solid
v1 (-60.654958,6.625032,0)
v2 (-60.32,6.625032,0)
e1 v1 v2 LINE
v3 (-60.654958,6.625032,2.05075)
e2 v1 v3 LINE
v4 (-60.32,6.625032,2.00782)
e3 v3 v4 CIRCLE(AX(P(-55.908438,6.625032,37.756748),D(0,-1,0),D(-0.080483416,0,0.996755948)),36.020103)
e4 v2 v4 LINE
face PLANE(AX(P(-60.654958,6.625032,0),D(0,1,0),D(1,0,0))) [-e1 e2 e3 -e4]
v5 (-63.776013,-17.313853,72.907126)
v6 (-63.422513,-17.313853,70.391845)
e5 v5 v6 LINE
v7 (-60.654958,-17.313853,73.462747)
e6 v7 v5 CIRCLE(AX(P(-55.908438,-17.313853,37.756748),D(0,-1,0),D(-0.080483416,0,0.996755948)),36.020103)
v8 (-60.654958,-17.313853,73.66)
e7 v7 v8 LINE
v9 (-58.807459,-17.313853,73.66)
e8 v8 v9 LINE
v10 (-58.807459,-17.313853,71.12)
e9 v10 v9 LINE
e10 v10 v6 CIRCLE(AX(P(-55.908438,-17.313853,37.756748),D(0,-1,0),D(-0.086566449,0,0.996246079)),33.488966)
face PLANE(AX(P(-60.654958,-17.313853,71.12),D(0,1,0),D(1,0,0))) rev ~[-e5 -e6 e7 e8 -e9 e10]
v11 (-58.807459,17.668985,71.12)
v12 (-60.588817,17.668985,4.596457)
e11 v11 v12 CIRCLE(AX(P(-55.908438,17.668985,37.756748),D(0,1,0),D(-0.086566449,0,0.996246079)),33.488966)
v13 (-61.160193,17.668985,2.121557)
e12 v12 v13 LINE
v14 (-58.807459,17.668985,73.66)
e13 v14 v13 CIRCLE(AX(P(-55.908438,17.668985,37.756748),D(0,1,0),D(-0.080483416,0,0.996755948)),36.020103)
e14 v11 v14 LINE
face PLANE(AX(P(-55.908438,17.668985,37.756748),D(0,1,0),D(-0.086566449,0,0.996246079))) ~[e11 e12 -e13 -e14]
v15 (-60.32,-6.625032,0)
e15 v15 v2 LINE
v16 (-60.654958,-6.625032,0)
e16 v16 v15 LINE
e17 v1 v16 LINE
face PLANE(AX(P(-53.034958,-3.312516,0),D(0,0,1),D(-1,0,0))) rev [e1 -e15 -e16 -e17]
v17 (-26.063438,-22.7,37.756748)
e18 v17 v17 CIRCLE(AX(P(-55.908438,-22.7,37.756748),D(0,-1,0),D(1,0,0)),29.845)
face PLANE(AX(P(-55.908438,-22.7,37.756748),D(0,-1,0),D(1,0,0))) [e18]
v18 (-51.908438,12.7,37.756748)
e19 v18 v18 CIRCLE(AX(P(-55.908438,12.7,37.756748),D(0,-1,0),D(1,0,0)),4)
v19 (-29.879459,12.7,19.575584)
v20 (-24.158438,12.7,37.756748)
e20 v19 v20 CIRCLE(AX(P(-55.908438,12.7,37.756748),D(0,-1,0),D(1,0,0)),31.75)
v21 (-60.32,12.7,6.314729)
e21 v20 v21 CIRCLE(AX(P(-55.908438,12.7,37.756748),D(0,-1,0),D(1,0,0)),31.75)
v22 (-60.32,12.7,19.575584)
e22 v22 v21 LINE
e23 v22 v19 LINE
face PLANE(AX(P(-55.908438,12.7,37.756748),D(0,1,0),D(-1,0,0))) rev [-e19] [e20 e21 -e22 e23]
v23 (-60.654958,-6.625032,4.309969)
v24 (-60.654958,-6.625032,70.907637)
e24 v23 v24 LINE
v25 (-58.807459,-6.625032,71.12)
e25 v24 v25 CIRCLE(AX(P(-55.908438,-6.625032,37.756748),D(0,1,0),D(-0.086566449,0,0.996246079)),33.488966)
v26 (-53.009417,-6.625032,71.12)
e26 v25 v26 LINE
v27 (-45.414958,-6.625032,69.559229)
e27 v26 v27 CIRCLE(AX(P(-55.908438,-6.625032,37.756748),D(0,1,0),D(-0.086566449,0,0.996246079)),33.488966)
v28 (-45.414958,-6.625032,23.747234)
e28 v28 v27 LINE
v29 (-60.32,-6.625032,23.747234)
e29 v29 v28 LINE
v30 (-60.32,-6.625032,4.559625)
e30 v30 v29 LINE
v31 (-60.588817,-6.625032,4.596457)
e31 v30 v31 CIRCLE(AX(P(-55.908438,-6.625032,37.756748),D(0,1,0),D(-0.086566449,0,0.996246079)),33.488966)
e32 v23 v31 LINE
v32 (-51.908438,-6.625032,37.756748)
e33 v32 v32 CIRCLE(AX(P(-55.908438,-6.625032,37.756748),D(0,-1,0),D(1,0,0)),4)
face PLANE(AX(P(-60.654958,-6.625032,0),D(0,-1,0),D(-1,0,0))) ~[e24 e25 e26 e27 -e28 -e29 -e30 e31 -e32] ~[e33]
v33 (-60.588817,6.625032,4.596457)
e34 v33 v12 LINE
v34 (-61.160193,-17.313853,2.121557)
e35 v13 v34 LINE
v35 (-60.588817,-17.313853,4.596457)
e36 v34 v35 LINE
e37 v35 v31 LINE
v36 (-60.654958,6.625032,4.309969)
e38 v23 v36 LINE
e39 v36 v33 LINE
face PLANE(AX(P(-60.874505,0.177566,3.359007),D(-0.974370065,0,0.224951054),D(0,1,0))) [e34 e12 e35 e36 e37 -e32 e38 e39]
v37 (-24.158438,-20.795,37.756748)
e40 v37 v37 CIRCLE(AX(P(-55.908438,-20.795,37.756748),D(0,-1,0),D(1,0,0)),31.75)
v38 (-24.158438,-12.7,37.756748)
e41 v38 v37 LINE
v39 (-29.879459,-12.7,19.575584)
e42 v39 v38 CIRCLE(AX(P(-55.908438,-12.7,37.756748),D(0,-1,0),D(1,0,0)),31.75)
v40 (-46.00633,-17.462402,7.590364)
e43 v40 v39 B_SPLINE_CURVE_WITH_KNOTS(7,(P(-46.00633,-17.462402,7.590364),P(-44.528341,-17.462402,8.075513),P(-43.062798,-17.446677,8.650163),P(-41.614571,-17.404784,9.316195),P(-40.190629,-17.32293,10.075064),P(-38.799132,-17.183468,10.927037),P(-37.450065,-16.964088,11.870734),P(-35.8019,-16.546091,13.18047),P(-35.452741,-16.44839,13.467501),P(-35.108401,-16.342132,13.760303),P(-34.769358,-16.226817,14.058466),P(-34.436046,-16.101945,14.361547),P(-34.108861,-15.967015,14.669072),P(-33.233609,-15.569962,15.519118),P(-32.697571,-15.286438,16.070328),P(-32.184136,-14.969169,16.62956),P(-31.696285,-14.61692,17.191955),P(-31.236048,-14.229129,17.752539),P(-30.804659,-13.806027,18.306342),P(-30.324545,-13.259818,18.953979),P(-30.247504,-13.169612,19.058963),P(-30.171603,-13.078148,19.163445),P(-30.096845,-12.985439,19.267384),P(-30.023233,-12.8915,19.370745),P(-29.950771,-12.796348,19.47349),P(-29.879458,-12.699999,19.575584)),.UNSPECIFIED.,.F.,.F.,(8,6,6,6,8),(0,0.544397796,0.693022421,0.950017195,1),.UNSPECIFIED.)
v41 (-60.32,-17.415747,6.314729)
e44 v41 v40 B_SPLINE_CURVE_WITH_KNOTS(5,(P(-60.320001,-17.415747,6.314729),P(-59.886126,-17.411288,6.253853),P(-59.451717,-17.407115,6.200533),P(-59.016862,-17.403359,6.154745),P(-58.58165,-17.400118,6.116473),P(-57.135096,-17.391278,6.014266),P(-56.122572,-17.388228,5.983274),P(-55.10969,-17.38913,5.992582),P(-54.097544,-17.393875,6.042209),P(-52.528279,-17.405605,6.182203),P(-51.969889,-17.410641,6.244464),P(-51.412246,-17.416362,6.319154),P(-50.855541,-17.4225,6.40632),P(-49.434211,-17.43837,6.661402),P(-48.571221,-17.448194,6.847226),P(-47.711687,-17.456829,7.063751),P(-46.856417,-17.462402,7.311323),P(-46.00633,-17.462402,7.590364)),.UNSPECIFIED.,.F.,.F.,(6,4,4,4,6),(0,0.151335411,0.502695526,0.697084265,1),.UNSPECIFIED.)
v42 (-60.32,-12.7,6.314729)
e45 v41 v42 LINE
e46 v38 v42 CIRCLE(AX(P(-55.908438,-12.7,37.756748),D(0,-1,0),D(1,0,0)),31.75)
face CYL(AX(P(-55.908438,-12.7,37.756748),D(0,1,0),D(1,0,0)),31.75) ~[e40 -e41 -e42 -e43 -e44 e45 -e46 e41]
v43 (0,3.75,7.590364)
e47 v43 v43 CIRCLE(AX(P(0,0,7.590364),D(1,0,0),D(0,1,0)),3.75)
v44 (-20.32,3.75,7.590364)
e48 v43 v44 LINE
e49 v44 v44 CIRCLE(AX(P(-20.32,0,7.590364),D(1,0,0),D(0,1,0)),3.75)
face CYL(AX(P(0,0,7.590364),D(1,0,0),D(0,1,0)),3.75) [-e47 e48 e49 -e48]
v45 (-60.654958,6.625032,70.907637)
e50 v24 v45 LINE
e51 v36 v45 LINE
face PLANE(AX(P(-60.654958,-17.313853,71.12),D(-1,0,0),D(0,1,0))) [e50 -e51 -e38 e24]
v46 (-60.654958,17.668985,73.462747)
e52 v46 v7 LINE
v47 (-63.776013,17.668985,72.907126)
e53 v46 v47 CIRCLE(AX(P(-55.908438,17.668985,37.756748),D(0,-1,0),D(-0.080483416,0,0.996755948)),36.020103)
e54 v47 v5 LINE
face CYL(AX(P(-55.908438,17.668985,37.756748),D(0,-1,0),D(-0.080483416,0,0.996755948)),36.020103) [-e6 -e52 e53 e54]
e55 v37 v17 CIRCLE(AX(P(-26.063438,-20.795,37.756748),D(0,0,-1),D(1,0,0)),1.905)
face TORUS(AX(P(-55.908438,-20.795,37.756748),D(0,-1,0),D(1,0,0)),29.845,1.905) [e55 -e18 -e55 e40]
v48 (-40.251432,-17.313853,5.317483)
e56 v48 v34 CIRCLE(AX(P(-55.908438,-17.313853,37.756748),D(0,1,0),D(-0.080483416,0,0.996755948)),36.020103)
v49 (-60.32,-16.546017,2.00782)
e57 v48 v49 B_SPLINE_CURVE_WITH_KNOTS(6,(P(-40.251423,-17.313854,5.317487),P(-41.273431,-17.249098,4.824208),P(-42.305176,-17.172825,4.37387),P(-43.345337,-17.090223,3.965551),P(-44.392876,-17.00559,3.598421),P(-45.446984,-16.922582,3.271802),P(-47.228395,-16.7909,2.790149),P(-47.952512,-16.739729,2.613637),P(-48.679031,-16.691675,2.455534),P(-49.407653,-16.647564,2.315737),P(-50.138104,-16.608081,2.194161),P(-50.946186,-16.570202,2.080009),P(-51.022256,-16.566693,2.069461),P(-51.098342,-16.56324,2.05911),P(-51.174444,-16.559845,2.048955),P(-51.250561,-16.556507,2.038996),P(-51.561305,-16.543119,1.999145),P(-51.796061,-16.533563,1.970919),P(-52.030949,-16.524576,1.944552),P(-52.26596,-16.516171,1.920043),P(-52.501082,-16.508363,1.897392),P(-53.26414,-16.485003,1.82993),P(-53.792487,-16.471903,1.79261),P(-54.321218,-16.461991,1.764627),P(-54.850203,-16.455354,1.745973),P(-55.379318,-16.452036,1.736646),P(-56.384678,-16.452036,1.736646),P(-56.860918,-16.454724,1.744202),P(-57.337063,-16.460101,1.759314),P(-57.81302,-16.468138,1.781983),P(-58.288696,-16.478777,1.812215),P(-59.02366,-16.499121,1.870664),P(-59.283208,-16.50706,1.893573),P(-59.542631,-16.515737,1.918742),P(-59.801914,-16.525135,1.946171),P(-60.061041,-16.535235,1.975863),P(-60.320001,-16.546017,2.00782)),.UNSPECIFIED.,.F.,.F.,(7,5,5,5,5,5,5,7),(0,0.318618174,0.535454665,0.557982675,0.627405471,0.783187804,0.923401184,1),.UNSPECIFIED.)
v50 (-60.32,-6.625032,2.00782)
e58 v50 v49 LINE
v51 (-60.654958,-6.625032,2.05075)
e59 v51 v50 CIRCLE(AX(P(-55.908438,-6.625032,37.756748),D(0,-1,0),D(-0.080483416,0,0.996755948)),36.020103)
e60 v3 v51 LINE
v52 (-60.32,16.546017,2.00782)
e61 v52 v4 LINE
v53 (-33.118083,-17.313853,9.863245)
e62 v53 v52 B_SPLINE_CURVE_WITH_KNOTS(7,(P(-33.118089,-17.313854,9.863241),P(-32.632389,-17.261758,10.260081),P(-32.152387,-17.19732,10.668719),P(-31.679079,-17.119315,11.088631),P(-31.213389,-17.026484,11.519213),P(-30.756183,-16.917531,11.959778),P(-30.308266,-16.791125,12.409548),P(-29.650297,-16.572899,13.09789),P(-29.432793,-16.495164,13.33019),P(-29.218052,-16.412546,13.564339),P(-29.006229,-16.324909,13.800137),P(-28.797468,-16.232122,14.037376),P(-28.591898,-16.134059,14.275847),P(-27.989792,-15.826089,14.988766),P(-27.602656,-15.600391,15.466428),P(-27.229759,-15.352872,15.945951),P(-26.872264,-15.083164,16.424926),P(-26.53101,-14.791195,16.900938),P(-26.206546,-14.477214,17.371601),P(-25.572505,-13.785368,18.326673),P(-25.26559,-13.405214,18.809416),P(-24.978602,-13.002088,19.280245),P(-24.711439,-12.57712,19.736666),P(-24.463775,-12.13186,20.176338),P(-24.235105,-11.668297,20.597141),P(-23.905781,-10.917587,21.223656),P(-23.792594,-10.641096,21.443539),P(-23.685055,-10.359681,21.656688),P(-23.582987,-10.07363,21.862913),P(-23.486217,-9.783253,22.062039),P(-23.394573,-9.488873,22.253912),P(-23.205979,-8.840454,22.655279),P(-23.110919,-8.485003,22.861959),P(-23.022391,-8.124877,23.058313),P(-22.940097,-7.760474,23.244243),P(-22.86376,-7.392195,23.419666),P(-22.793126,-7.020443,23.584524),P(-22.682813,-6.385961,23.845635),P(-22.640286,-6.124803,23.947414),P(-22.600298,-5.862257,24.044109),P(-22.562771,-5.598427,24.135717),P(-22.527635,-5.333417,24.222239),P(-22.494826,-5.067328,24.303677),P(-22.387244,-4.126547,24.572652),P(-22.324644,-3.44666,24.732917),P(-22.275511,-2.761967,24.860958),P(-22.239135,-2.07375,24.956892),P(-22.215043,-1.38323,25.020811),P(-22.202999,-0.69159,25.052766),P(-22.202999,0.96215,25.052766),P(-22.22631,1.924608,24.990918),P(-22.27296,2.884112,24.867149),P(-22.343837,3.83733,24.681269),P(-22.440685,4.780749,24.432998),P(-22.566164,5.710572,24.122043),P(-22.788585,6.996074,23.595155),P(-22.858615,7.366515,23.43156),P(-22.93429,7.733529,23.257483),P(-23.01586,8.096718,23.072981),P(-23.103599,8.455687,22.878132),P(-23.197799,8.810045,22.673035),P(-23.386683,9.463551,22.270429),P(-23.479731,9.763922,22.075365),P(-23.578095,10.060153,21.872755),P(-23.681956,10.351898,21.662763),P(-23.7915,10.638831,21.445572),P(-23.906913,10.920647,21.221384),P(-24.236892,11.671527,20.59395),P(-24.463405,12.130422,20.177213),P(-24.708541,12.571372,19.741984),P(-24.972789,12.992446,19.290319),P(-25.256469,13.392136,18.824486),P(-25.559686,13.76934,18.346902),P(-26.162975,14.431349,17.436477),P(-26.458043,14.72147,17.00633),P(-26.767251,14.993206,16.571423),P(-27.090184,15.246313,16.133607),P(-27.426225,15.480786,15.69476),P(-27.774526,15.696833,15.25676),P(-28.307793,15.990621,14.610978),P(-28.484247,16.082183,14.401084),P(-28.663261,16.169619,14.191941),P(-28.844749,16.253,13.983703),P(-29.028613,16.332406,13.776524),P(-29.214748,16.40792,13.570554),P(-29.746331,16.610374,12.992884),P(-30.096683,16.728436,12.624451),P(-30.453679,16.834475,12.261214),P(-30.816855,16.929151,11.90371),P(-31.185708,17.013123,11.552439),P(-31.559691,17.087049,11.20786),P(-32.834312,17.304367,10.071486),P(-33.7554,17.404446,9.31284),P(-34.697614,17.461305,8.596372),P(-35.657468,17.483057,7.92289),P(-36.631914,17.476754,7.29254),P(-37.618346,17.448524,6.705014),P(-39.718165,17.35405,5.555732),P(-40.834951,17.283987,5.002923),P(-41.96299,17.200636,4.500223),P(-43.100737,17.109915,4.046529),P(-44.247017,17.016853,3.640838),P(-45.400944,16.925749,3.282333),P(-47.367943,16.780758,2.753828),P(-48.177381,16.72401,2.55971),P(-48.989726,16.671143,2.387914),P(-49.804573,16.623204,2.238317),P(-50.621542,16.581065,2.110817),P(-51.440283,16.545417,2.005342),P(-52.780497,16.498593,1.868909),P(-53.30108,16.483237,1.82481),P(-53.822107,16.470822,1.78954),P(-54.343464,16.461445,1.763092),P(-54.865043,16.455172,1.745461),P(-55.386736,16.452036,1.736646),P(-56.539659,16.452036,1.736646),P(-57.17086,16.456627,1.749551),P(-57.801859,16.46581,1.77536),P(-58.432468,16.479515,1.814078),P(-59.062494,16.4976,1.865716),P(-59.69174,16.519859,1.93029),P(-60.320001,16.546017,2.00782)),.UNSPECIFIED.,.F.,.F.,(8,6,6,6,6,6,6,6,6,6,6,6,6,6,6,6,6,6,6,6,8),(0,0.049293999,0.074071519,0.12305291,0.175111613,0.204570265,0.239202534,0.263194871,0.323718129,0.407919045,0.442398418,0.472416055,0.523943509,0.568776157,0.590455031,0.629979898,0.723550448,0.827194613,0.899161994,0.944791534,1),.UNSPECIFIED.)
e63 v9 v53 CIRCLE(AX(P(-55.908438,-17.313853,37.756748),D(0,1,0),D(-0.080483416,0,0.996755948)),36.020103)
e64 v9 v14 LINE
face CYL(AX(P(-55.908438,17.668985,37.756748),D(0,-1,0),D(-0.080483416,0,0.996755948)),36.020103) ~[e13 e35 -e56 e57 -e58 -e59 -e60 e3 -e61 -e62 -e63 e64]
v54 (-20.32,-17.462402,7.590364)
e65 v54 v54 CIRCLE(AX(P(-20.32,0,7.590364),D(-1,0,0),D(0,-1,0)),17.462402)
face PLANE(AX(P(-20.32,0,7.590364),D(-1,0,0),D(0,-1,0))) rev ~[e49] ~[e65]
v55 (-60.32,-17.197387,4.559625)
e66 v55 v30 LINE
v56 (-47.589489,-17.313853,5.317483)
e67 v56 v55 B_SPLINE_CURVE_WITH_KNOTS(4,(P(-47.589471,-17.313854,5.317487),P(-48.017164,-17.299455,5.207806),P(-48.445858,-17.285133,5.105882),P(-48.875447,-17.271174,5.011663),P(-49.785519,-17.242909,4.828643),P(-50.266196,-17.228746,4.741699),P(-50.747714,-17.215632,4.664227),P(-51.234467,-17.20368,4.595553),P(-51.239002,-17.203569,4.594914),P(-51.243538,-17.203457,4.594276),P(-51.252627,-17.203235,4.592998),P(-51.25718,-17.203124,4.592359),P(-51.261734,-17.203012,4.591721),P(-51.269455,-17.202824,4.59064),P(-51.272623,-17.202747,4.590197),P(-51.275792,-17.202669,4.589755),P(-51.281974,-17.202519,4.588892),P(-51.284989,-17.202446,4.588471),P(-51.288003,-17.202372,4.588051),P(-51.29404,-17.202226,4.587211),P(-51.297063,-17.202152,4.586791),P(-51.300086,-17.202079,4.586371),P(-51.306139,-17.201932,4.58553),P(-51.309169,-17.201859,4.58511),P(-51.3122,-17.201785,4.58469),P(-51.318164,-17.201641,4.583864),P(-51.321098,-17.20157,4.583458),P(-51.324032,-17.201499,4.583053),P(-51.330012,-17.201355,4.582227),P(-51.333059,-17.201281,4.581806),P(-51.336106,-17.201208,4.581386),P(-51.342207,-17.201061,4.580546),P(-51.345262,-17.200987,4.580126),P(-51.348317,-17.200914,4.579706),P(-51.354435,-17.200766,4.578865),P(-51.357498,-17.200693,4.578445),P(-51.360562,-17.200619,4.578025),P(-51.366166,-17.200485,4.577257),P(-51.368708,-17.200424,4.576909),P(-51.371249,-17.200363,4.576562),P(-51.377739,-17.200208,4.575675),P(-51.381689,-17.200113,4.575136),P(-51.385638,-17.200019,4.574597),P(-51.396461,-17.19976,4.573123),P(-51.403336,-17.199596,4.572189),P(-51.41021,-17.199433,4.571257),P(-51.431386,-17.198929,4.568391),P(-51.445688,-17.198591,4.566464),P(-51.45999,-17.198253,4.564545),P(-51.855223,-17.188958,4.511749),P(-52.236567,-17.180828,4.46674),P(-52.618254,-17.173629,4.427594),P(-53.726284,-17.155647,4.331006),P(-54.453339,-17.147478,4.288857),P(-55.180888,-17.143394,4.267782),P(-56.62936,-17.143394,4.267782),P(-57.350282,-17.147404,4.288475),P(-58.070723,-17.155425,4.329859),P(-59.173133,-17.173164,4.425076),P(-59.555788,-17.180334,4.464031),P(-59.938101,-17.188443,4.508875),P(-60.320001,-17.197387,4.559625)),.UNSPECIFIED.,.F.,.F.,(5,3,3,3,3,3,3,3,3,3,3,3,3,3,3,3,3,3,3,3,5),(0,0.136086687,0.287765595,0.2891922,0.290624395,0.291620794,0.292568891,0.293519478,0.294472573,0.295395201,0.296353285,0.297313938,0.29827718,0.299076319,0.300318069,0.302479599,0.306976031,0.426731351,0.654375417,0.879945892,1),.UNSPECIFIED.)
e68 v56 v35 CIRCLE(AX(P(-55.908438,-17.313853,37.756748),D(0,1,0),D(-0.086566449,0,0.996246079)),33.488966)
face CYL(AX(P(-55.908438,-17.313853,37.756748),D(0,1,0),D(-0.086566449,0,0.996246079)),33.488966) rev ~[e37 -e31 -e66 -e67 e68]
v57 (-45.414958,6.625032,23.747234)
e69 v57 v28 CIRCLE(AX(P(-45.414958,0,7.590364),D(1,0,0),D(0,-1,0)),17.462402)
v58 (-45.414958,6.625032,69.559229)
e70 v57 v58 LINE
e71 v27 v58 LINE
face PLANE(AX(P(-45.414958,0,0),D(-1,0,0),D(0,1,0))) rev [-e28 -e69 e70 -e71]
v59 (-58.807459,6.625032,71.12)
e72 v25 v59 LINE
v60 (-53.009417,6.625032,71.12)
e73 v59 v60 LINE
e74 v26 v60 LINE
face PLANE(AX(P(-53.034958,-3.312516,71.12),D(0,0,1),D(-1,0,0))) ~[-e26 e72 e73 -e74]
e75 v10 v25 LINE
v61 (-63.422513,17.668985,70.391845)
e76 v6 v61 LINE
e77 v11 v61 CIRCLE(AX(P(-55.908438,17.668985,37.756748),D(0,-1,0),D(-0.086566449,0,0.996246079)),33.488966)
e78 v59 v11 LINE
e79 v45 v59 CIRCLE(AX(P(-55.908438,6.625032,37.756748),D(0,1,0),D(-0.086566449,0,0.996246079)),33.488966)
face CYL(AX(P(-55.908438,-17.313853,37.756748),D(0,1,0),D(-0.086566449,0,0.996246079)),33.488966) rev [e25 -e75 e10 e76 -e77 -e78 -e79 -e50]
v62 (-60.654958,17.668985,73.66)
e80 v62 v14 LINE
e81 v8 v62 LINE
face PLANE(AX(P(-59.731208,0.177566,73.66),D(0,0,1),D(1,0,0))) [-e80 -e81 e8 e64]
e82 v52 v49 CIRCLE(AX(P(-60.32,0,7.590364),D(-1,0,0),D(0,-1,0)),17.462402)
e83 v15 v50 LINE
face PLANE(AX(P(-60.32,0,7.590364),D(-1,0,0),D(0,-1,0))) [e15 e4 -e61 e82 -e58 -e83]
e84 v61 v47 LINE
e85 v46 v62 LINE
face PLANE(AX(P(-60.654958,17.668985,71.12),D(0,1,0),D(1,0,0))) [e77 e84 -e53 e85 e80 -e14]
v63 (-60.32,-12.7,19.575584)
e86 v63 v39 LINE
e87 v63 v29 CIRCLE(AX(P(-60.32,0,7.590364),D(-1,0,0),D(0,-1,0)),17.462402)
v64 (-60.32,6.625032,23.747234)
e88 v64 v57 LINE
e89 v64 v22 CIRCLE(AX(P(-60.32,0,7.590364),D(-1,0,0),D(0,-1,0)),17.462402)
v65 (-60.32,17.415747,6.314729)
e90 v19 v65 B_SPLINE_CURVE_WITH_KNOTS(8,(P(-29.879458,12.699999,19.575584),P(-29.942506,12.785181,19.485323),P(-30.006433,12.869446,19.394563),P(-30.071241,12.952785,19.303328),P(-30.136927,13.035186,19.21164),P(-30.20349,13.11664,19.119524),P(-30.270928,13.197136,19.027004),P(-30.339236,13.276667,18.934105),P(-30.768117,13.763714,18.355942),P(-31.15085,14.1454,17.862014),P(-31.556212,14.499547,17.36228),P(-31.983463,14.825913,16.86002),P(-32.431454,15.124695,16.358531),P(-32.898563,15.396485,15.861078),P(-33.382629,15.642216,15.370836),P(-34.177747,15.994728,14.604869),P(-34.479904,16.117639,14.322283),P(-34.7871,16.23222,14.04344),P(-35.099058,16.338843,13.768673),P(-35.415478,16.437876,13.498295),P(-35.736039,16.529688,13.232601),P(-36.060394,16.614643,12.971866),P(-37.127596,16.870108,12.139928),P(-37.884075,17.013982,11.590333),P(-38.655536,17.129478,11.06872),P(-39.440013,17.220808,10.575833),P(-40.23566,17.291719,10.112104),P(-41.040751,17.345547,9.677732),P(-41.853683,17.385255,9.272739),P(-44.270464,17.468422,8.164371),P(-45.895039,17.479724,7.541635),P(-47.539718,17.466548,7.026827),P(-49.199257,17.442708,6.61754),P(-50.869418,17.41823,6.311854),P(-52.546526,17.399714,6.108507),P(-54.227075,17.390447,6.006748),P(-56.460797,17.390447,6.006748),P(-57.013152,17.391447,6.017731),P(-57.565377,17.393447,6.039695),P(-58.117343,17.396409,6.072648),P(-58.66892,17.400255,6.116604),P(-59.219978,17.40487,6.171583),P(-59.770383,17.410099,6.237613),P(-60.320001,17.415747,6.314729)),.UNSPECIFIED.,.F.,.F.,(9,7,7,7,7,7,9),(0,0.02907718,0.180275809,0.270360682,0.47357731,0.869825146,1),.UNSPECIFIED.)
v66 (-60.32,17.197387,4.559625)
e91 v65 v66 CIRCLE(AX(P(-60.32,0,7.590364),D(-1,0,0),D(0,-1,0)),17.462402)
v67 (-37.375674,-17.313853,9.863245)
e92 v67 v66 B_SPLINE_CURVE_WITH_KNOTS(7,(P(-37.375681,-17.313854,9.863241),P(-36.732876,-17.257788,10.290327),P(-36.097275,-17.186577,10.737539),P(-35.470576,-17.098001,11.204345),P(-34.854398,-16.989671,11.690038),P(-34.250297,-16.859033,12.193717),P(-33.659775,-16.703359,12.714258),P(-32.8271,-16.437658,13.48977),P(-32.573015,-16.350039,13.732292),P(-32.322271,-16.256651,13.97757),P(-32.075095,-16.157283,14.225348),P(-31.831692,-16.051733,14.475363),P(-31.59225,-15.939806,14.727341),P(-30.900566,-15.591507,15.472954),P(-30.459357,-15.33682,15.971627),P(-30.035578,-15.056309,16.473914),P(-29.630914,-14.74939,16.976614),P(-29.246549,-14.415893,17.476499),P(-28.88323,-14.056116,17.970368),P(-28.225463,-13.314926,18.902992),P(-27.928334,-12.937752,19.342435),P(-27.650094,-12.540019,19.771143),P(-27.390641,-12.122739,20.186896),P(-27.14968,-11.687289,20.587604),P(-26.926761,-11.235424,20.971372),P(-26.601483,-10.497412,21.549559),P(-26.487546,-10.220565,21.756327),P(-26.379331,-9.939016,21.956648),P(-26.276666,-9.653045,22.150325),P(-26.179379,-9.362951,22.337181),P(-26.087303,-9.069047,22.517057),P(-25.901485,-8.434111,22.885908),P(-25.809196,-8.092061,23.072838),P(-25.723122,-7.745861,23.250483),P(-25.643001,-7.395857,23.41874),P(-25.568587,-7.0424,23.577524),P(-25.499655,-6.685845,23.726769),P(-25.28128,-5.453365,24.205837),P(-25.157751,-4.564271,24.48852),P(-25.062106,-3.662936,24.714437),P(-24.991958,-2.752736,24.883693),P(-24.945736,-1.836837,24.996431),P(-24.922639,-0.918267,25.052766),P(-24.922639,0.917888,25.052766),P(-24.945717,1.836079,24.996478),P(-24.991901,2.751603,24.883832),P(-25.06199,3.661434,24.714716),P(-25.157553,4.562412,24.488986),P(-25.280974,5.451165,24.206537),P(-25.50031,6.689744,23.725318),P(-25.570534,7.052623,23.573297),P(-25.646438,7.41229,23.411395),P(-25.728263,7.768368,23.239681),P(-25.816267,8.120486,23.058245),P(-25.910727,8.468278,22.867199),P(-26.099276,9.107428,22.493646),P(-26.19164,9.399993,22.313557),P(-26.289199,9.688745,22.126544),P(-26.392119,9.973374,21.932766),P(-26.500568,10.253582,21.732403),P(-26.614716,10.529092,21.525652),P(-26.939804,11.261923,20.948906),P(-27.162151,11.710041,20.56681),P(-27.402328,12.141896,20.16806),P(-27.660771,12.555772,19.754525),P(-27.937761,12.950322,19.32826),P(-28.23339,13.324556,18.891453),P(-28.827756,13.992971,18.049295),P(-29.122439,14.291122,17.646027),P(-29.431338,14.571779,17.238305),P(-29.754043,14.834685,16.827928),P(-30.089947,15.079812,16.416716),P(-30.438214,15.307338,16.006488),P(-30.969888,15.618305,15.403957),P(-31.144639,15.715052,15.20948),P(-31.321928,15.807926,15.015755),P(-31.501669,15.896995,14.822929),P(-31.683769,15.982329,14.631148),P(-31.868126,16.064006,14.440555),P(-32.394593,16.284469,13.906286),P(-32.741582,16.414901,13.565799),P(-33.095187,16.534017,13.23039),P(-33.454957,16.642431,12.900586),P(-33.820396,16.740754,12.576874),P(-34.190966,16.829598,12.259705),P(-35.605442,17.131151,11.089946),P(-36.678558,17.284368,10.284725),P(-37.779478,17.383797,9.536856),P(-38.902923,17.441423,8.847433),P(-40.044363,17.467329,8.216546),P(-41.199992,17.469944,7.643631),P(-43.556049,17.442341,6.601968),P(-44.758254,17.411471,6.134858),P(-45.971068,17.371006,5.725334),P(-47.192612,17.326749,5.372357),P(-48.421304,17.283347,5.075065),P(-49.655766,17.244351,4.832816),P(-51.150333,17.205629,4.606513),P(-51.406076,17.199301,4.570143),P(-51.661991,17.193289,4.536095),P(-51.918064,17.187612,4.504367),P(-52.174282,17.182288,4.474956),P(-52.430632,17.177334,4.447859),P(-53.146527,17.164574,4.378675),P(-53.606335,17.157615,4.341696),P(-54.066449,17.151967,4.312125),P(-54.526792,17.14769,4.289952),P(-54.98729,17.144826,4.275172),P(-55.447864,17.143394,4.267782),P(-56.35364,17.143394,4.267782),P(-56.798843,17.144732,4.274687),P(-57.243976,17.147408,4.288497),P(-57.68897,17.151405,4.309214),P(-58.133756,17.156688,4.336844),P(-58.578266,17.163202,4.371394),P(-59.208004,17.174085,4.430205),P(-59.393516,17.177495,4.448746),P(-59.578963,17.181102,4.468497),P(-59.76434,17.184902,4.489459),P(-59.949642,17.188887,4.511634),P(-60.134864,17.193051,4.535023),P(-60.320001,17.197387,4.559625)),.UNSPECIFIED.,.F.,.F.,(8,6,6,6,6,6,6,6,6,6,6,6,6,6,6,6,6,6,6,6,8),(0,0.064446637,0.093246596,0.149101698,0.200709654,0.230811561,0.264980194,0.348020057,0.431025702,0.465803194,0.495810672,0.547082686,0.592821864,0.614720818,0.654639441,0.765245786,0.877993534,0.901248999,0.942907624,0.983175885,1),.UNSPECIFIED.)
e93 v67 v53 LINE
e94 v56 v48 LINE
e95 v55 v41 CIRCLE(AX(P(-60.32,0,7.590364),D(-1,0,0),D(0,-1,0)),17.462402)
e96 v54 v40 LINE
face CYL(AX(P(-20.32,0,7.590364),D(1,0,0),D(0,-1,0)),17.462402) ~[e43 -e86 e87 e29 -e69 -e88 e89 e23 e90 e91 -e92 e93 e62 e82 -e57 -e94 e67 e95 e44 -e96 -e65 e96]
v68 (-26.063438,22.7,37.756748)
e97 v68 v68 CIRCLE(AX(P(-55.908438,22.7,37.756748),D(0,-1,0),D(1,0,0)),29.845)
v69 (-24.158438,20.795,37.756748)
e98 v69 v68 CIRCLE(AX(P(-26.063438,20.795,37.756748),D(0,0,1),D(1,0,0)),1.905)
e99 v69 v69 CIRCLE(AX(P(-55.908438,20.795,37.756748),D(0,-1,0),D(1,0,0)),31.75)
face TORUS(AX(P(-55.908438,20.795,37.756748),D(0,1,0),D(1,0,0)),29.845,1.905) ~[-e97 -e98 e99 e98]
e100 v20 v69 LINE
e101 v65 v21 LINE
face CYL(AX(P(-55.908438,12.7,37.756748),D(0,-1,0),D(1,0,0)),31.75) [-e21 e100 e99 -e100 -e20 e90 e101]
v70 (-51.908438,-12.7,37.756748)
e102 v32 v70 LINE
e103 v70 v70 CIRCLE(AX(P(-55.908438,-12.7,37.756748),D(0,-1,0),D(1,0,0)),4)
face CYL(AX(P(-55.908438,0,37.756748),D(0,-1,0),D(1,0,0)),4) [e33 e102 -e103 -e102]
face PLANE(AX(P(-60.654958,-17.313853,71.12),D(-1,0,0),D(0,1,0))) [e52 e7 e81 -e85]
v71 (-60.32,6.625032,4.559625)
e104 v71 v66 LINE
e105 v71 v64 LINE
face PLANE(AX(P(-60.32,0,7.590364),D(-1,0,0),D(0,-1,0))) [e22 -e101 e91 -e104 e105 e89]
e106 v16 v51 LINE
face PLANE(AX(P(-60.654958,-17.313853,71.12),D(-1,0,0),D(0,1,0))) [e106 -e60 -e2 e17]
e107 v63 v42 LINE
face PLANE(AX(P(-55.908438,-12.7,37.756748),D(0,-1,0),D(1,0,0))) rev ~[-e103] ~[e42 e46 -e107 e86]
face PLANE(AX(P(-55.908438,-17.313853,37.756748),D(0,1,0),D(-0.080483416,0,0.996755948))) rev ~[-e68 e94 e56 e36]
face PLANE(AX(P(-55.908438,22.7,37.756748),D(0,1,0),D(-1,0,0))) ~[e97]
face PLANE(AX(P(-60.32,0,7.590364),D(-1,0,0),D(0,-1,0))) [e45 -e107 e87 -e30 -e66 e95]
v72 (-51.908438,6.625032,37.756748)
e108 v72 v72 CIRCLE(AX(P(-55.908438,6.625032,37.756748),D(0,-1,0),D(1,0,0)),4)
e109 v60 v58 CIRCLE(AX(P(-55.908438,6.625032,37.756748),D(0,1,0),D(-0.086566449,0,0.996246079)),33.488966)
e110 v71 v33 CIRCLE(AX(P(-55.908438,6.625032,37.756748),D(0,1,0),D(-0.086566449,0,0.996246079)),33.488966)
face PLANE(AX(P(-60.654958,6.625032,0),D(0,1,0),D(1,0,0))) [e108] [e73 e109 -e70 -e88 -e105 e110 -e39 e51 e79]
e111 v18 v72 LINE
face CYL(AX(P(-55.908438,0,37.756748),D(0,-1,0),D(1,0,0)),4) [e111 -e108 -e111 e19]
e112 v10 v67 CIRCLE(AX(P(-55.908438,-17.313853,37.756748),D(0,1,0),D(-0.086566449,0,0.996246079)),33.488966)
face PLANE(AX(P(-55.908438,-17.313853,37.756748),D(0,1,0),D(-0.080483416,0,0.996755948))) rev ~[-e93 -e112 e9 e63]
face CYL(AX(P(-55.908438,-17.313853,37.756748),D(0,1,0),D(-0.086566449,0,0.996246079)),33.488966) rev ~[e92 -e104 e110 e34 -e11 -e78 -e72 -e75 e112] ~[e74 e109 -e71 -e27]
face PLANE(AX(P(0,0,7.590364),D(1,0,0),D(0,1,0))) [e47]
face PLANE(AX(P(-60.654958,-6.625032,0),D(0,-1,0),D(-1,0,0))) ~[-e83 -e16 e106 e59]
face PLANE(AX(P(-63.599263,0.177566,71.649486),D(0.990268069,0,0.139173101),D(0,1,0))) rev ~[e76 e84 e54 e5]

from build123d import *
from build123d import SkipClean  # not in build123d's __all__

# Parameters (mm, degrees)
F0_R      = 4
F1_DEPTH  = 12.7
F2_R      = 31.75
F3_DEPTH  = 10
F4_R      = 1.905
F6_W      = 15.24
F6_H      = 6.6250320524
F7_DEPTH  = 71.12
F9_W      = 1.8474994206
F9_H      = 34.9828377366
F10_DEPTH = 2.54
F11_ANGLE = 8
F12_ANGLE = 193
F13_R     = 3.75
F14_DEPTH = 20.32
F15_R     = 17.4624022324
F16_DEPTH = 40


with BuildPart() as f1:
    # F0 (on Front) → F1 (new body)
    with BuildSketch(Plane.XZ):
        with Locations((-55.9084378183, 37.7567484975)):
            Circle(F0_R)
    extrude(amount=F1_DEPTH)

    # F2 (on face) → F3 (join)
    with BuildSketch(Plane.XZ.offset(12.7)):
        with Locations((-55.9084378183, 37.7567484975)):
            Circle(F2_R)
    extrude(amount=F3_DEPTH)

    # F4
    f4_edges = [f1.edges().sort_by_distance(p)[0] for p in [
        (-87.658438, -22.7, 37.756748),
    ]]
    fillet(f4_edges, radius=F4_R)

    # F5: F1 across plane


with BuildPart() as f1_1:
    add(f1.part, clean=False)
    add(f1.part.mirror(Plane.XZ), clean=False)

    # F6 (on Top) → F7 (join)
    with BuildSketch(Plane.XY):
        with Locations((-53.0349581492, 3.3125160262)):
            Rectangle(F6_W, F6_H)
    extrude(amount=F7_DEPTH)

    # F8: F1 across plane


with BuildPart() as f1_2:
    add(f1_1.part, clean=False)
    add(f1_1.part.mirror(Plane.XZ), clean=False)

    # F9 (on face) → F10 (join)
    with BuildSketch(Plane.XY.offset(71.12)):
        with Locations((-59.7312084389, 0.1775659621)):
            Rectangle(F9_W, F9_H)
    extrude(amount=F10_DEPTH)

    # F10_face (on face) → F11 (revolve)
    with BuildSketch(Plane(origin=(-58.8074587286, 0.1775659621, 72.39), x_dir=(0, 1, 0), z_dir=(1, 0, 0))):
        Polygon((-17.4914188683, 1.27), (-17.4914188683, -1.27), (-6.8025980145, -1.27), (6.4474660903, -1.27), (17.4914188683, -1.27), (17.4914188683, 1.27), align=None)
    revolve(axis=Axis((-55.9084378183, -22.7, 37.7567484975), (0, -1, 0)), revolution_arc=F11_ANGLE)

    # F10_face (on face) → F12 (revolve)
    with BuildSketch(Plane(origin=(-58.8074587286, 0.1775659621, 72.39), x_dir=(0, 1, 0), z_dir=(1, 0, 0))):
        Polygon((-17.4914188683, 1.27), (-17.4914188683, -1.27), (-6.8025980145, -1.27), (6.4474660903, -1.27), (17.4914188683, -1.27), (17.4914188683, 1.27), align=None)
    with SkipClean():  # cleaning this boolean's faces spoils the solid; the shape is the same uncleaned
        revolve(axis=Axis((-55.9084378183, -22.7, 37.7567484975), (0, 1, 0)), revolution_arc=F12_ANGLE)



with BuildPart() as f14:
    # F13 (on Right) → F14 (new body)
    with BuildSketch(Plane.YZ):
        with Locations((0, 7.5903639288)):
            Circle(F13_R)
    extrude(amount=-F14_DEPTH)


with BuildPart() as f1_3:
    add(f1_2.part, clean=False)

    with SkipClean():  # cleaning this boolean's faces spoils the solid; the shape is the same uncleaned
        add(f14.part)  # F16 merges F14
    # F15 (on face) → F16 (join)
    with BuildSketch(Plane(origin=(-20.32, 0, 0), x_dir=(0, -1, 0), z_dir=(-1, 0, 0))):
        with Locations((0, 7.5903639288)):
            Circle(F15_R)
    with SkipClean():  # cleaning this boolean's faces spoils the solid; the shape is the same uncleaned
        extrude(amount=F16_DEPTH)


solid = f1_3.part
